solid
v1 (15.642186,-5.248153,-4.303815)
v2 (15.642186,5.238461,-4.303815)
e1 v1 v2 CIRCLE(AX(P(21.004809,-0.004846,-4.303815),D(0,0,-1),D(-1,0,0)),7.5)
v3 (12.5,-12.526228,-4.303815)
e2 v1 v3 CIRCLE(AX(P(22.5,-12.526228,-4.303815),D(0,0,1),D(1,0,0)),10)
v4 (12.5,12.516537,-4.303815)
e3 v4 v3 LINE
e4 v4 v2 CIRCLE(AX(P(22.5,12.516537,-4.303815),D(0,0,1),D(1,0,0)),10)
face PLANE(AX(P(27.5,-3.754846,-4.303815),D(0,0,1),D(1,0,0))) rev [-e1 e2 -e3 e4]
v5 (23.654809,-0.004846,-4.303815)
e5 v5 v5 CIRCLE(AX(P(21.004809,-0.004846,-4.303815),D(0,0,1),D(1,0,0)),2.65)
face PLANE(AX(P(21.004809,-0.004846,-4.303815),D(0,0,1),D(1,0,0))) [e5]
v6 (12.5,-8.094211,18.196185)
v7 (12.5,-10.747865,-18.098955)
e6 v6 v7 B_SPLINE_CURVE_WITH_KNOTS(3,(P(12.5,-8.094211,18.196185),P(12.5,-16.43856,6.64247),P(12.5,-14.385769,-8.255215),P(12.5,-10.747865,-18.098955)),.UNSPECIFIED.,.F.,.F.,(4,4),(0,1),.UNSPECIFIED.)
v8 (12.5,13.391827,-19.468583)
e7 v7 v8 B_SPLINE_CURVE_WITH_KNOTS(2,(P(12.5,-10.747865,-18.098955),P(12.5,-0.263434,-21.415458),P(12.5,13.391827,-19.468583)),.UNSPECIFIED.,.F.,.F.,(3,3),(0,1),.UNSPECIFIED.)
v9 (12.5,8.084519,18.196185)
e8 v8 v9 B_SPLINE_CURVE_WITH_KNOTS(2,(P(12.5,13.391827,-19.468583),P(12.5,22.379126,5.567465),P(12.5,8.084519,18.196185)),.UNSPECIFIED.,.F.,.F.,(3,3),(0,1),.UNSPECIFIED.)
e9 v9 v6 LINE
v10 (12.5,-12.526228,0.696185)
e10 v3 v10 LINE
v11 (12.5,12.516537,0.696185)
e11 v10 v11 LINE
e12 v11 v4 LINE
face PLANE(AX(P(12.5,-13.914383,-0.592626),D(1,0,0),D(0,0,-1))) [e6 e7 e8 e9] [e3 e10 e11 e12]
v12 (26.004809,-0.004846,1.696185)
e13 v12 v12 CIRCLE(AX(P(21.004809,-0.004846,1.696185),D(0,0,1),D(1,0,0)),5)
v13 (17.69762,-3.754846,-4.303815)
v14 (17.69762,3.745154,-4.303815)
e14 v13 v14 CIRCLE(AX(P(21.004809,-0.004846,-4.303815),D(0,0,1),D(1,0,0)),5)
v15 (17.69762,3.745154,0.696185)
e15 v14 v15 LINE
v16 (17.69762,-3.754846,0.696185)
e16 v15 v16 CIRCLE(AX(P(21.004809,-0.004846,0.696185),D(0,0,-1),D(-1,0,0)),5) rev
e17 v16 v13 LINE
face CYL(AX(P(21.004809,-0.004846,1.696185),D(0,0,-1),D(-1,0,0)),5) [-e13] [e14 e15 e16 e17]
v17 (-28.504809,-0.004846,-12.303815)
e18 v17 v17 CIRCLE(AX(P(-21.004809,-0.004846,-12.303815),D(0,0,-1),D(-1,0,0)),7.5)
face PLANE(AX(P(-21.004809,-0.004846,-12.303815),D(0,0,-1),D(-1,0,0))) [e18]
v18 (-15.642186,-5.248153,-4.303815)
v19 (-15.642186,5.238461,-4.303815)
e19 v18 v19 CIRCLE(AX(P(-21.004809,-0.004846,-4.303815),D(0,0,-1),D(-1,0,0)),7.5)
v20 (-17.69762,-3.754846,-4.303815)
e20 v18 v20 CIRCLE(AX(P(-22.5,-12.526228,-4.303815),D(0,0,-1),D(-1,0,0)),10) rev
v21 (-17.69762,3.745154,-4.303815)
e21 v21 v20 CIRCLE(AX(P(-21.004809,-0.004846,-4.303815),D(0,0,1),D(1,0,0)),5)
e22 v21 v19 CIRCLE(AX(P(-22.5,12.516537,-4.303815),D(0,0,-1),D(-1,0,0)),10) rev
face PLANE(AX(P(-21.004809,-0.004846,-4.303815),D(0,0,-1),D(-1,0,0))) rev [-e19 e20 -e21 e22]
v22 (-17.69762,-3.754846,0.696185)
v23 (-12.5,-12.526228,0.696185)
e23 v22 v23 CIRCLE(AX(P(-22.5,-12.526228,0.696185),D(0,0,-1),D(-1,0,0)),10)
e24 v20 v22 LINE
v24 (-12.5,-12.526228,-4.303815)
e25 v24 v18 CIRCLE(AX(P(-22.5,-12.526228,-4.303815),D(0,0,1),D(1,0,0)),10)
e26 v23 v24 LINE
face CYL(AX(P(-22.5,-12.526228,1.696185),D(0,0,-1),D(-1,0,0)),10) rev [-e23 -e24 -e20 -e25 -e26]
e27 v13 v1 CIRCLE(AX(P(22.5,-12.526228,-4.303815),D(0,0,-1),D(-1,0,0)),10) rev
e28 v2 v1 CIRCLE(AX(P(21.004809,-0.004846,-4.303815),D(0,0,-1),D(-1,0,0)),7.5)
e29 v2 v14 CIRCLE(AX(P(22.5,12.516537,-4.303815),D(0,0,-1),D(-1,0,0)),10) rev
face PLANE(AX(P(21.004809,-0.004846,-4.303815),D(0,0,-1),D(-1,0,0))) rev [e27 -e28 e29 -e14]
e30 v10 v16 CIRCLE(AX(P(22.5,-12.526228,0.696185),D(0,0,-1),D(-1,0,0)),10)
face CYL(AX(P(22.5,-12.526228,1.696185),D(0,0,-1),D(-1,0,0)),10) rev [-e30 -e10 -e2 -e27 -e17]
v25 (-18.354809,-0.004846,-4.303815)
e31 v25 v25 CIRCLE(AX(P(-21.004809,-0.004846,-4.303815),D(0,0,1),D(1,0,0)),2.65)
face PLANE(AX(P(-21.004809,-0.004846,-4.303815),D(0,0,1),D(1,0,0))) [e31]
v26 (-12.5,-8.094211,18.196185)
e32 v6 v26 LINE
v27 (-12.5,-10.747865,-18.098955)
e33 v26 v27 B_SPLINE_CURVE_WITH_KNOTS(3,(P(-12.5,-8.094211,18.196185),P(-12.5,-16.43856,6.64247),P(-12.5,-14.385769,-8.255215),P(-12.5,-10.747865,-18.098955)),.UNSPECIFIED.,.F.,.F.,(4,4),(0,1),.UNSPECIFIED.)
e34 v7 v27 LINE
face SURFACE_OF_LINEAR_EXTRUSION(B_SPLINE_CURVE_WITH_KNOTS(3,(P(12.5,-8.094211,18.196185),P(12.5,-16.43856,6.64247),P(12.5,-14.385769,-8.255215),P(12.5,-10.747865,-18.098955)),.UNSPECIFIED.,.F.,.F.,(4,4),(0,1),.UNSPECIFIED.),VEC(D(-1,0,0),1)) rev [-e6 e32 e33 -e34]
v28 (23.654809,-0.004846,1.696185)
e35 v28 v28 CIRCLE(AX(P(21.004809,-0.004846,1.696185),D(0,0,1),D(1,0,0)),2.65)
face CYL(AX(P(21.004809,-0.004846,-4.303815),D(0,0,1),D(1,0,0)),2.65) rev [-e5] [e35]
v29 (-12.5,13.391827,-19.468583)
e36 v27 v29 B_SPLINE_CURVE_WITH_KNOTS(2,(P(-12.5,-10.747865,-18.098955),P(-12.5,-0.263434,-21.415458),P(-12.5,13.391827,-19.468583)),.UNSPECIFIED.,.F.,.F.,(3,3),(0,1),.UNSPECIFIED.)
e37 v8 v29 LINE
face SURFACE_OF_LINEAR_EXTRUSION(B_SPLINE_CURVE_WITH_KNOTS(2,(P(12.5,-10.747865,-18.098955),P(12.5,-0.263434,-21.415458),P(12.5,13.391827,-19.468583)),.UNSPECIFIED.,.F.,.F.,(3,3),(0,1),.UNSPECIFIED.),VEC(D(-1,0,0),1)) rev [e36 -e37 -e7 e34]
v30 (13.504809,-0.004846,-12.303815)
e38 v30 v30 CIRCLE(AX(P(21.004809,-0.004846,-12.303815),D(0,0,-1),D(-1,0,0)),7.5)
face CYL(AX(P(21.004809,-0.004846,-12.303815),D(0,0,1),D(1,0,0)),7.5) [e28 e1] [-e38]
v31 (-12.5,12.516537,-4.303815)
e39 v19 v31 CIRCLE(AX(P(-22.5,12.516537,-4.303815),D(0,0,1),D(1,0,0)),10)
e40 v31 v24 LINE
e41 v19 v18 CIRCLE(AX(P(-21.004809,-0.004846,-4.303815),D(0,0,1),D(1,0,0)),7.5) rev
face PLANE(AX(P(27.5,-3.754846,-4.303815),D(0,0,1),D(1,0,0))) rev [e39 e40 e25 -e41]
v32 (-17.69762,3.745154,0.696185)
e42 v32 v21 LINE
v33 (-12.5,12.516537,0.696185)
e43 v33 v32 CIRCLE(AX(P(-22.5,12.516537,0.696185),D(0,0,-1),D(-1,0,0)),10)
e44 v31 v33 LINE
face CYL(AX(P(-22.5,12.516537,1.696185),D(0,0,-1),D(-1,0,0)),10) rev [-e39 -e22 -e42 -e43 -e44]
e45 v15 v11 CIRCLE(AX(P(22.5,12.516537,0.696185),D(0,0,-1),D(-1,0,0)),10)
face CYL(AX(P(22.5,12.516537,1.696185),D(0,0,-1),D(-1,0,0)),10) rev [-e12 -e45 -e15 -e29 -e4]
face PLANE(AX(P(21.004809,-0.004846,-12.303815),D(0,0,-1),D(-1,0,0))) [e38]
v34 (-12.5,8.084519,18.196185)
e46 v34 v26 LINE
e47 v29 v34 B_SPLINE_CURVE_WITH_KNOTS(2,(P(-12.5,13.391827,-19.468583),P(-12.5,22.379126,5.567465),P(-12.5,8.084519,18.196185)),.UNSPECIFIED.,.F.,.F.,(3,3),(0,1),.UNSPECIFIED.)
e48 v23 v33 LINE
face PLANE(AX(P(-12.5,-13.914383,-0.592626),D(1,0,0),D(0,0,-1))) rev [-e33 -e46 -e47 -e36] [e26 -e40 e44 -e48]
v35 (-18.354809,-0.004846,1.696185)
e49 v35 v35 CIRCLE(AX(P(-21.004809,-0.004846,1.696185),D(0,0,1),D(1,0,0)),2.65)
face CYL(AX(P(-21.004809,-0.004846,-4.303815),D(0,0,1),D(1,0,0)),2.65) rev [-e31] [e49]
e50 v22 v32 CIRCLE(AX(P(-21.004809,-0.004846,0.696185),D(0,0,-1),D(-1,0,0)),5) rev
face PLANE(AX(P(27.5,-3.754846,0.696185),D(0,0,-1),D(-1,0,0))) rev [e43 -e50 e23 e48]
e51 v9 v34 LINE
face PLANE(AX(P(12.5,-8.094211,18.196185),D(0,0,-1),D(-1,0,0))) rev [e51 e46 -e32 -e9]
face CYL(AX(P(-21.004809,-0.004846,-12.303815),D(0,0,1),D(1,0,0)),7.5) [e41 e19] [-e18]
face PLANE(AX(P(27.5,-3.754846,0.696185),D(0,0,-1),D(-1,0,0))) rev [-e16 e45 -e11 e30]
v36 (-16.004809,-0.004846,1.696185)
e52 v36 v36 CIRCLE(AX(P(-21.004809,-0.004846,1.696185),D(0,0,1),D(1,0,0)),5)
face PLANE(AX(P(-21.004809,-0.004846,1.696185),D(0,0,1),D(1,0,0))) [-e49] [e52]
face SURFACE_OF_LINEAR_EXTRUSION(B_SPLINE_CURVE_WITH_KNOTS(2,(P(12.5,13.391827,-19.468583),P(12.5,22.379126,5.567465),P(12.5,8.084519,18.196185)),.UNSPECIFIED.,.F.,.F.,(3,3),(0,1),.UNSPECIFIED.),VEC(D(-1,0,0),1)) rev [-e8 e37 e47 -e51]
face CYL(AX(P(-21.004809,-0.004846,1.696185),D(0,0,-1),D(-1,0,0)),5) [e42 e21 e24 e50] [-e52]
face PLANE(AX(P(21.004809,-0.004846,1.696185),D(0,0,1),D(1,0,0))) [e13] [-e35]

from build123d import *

# Parameters (mm, degrees)
BOSS_EXTRUDE1_DEPTH = 12.5
SKETCH3_W           = 5
SKETCH3_H           = 7.5
BOSS_EXTRUDE2_DEPTH = 27.5
SKETCH4_R           = 7.5
BOSS_EXTRUDE3_DEPTH = 8
SKETCH5_W           = 10.105162594
SKETCH5_H           = 17.406531809
CUT_EXTRUDE1_DEPTH  = 151.624338723
SKETCH6_R           = 5
BOSS_EXTRUDE4_DEPTH = 6
FILLET1_R           = 10
SKETCH7_R           = 2.65
CUT_EXTRUDE2_DEPTH  = 6


with BuildPart() as part:
    # Sketch1 → Boss-Extrude1 (new, symmetric)
    with BuildSketch(Plane(origin=(0, 0, 0), x_dir=(0, 0, -1), z_dir=(1, 0, 0))):
        with BuildLine():
            Line((-19.096184677, 121.225789304), (-19.096184677, 137.404518888))
            add(Edge.make_bspline(
                [(-19.096184677, 137.404518888), (-6.467464955, 151.699126132), (18.56858261, 142.711827006)],
                knots=[0, 0, 0, 1, 1, 1], degree=2))
            add(Edge.make_bspline(
                [(18.56858261, 142.711827006), (20.515458249, 129.056565793), (17.198954708, 118.572135245)],
                knots=[0, 0, 0, 1, 1, 1], degree=2))
            add(Edge.make_bspline(
                [(17.198954708, 118.572135245), (7.355214534, 114.934231268), (-7.542469836, 112.881439696), (-19.096184677, 121.225789304)],
                knots=[0, 0, 0, 0, 1, 1, 1, 1], degree=3))
        make_face()
    extrude(amount=BOSS_EXTRUDE1_DEPTH, both=True)

    # Sketch3 → Boss-Extrude2 (add, symmetric)
    with BuildSketch(Plane(origin=(0, 0, 0), x_dir=(0, 0, -1), z_dir=(1, 0, 0))):
        with Locations((0.903815323, 129.315154096)):
            Rectangle(SKETCH3_W, SKETCH3_H)
    extrude(amount=BOSS_EXTRUDE2_DEPTH, both=True)

    # Sketch4 → Boss-Extrude3 (add)
    with BuildSketch(Plane(origin=(0, 0, -3.403815323), x_dir=(-1, 0, 0), z_dir=(0, 0, -1))):
        with Locations(Location((-21.004809472, 129.315154096, 0), (0, 0, 210))):
            Circle(SKETCH4_R)
        with Locations(Location((21.004809472, 129.315154096, 0), (0, 0, 210))):
            Circle(SKETCH4_R)
    extrude(amount=BOSS_EXTRUDE3_DEPTH)

    # Sketch5 → Cut-Extrude1 (cut, through all)
    with BuildSketch(Plane.XY.offset(-3.403815323)):
        with Locations((-26.057390769, 128.111888192)):
            Rectangle(SKETCH5_W, SKETCH5_H)
        with Locations((26.057390769, 128.111888192)):
            Rectangle(SKETCH5_W, SKETCH5_H)
    extrude(amount=CUT_EXTRUDE1_DEPTH, mode=Mode.SUBTRACT)

    # Sketch6 → Boss-Extrude4 (add)
    with BuildSketch(Plane.XY.offset(-3.403815323)):
        with Locations(Location((21.004809472, 129.315154096, 0), (0, 0, 228.590377891))):
            Circle(SKETCH6_R)
        with Locations(Location((-21.004809472, 129.315154096, 0), (0, 0, 48.590377891))):
            Circle(SKETCH6_R)
    extrude(amount=BOSS_EXTRUDE4_DEPTH)

    # Fillet1
    # the kernel refuses this fillet: 10 mm, written as the material it adds along each edge
    with BuildSketch(Plane(origin=(12.5, 125.565154096, 1.596184677), x_dir=(0, -1, 0), z_dir=(0, 0, -1)), Plane(origin=(12.5, 133.065154096, -3.403815323), x_dir=(0, 1, 0), z_dir=(0, 0, 1))) as fillet1_piece_1:
        with BuildLine():
            CenterArc((8.771382419, -10), FILLET1_R, 90, 61.299054853)
            Line((0, -5.197620333), (0, 0))
            Line((0, 0), (8.771382419, 0))
        make_face()
    extrude(amount=5)
    with BuildSketch(Plane(origin=(-12.5, 133.065154096, -3.403815323), x_dir=(0, 1, 0), z_dir=(0, 0, 1)), Plane(origin=(-12.5, 125.565154096, 1.596184677), x_dir=(0, -1, 0), z_dir=(0, 0, -1))) as fillet1_piece_2:
        with BuildLine():
            CenterArc((8.771382419, 10), FILLET1_R, 208.700945147, 61.299054853)
            Line((0, 5.197620333), (0, 0))
            Line((0, 0), (8.771382419, 0))
        make_face()
    extrude(amount=5)

    # Sketch7 → Cut-Extrude2 (cut)
    with BuildSketch(Plane.XY.offset(2.596184677)):
        with Locations((21.004809472, 129.315154096)):
            Circle(SKETCH7_R)
        with Locations((-21.004809472, 129.315154096)):
            Circle(SKETCH7_R)
    extrude(amount=-CUT_EXTRUDE2_DEPTH, mode=Mode.SUBTRACT)


with BuildPart() as part_1:
    # Body-Move/Copy1: moved
    add(part.part.moved(Location((0, -129.32, -0.9))))


solid = part_1.part
